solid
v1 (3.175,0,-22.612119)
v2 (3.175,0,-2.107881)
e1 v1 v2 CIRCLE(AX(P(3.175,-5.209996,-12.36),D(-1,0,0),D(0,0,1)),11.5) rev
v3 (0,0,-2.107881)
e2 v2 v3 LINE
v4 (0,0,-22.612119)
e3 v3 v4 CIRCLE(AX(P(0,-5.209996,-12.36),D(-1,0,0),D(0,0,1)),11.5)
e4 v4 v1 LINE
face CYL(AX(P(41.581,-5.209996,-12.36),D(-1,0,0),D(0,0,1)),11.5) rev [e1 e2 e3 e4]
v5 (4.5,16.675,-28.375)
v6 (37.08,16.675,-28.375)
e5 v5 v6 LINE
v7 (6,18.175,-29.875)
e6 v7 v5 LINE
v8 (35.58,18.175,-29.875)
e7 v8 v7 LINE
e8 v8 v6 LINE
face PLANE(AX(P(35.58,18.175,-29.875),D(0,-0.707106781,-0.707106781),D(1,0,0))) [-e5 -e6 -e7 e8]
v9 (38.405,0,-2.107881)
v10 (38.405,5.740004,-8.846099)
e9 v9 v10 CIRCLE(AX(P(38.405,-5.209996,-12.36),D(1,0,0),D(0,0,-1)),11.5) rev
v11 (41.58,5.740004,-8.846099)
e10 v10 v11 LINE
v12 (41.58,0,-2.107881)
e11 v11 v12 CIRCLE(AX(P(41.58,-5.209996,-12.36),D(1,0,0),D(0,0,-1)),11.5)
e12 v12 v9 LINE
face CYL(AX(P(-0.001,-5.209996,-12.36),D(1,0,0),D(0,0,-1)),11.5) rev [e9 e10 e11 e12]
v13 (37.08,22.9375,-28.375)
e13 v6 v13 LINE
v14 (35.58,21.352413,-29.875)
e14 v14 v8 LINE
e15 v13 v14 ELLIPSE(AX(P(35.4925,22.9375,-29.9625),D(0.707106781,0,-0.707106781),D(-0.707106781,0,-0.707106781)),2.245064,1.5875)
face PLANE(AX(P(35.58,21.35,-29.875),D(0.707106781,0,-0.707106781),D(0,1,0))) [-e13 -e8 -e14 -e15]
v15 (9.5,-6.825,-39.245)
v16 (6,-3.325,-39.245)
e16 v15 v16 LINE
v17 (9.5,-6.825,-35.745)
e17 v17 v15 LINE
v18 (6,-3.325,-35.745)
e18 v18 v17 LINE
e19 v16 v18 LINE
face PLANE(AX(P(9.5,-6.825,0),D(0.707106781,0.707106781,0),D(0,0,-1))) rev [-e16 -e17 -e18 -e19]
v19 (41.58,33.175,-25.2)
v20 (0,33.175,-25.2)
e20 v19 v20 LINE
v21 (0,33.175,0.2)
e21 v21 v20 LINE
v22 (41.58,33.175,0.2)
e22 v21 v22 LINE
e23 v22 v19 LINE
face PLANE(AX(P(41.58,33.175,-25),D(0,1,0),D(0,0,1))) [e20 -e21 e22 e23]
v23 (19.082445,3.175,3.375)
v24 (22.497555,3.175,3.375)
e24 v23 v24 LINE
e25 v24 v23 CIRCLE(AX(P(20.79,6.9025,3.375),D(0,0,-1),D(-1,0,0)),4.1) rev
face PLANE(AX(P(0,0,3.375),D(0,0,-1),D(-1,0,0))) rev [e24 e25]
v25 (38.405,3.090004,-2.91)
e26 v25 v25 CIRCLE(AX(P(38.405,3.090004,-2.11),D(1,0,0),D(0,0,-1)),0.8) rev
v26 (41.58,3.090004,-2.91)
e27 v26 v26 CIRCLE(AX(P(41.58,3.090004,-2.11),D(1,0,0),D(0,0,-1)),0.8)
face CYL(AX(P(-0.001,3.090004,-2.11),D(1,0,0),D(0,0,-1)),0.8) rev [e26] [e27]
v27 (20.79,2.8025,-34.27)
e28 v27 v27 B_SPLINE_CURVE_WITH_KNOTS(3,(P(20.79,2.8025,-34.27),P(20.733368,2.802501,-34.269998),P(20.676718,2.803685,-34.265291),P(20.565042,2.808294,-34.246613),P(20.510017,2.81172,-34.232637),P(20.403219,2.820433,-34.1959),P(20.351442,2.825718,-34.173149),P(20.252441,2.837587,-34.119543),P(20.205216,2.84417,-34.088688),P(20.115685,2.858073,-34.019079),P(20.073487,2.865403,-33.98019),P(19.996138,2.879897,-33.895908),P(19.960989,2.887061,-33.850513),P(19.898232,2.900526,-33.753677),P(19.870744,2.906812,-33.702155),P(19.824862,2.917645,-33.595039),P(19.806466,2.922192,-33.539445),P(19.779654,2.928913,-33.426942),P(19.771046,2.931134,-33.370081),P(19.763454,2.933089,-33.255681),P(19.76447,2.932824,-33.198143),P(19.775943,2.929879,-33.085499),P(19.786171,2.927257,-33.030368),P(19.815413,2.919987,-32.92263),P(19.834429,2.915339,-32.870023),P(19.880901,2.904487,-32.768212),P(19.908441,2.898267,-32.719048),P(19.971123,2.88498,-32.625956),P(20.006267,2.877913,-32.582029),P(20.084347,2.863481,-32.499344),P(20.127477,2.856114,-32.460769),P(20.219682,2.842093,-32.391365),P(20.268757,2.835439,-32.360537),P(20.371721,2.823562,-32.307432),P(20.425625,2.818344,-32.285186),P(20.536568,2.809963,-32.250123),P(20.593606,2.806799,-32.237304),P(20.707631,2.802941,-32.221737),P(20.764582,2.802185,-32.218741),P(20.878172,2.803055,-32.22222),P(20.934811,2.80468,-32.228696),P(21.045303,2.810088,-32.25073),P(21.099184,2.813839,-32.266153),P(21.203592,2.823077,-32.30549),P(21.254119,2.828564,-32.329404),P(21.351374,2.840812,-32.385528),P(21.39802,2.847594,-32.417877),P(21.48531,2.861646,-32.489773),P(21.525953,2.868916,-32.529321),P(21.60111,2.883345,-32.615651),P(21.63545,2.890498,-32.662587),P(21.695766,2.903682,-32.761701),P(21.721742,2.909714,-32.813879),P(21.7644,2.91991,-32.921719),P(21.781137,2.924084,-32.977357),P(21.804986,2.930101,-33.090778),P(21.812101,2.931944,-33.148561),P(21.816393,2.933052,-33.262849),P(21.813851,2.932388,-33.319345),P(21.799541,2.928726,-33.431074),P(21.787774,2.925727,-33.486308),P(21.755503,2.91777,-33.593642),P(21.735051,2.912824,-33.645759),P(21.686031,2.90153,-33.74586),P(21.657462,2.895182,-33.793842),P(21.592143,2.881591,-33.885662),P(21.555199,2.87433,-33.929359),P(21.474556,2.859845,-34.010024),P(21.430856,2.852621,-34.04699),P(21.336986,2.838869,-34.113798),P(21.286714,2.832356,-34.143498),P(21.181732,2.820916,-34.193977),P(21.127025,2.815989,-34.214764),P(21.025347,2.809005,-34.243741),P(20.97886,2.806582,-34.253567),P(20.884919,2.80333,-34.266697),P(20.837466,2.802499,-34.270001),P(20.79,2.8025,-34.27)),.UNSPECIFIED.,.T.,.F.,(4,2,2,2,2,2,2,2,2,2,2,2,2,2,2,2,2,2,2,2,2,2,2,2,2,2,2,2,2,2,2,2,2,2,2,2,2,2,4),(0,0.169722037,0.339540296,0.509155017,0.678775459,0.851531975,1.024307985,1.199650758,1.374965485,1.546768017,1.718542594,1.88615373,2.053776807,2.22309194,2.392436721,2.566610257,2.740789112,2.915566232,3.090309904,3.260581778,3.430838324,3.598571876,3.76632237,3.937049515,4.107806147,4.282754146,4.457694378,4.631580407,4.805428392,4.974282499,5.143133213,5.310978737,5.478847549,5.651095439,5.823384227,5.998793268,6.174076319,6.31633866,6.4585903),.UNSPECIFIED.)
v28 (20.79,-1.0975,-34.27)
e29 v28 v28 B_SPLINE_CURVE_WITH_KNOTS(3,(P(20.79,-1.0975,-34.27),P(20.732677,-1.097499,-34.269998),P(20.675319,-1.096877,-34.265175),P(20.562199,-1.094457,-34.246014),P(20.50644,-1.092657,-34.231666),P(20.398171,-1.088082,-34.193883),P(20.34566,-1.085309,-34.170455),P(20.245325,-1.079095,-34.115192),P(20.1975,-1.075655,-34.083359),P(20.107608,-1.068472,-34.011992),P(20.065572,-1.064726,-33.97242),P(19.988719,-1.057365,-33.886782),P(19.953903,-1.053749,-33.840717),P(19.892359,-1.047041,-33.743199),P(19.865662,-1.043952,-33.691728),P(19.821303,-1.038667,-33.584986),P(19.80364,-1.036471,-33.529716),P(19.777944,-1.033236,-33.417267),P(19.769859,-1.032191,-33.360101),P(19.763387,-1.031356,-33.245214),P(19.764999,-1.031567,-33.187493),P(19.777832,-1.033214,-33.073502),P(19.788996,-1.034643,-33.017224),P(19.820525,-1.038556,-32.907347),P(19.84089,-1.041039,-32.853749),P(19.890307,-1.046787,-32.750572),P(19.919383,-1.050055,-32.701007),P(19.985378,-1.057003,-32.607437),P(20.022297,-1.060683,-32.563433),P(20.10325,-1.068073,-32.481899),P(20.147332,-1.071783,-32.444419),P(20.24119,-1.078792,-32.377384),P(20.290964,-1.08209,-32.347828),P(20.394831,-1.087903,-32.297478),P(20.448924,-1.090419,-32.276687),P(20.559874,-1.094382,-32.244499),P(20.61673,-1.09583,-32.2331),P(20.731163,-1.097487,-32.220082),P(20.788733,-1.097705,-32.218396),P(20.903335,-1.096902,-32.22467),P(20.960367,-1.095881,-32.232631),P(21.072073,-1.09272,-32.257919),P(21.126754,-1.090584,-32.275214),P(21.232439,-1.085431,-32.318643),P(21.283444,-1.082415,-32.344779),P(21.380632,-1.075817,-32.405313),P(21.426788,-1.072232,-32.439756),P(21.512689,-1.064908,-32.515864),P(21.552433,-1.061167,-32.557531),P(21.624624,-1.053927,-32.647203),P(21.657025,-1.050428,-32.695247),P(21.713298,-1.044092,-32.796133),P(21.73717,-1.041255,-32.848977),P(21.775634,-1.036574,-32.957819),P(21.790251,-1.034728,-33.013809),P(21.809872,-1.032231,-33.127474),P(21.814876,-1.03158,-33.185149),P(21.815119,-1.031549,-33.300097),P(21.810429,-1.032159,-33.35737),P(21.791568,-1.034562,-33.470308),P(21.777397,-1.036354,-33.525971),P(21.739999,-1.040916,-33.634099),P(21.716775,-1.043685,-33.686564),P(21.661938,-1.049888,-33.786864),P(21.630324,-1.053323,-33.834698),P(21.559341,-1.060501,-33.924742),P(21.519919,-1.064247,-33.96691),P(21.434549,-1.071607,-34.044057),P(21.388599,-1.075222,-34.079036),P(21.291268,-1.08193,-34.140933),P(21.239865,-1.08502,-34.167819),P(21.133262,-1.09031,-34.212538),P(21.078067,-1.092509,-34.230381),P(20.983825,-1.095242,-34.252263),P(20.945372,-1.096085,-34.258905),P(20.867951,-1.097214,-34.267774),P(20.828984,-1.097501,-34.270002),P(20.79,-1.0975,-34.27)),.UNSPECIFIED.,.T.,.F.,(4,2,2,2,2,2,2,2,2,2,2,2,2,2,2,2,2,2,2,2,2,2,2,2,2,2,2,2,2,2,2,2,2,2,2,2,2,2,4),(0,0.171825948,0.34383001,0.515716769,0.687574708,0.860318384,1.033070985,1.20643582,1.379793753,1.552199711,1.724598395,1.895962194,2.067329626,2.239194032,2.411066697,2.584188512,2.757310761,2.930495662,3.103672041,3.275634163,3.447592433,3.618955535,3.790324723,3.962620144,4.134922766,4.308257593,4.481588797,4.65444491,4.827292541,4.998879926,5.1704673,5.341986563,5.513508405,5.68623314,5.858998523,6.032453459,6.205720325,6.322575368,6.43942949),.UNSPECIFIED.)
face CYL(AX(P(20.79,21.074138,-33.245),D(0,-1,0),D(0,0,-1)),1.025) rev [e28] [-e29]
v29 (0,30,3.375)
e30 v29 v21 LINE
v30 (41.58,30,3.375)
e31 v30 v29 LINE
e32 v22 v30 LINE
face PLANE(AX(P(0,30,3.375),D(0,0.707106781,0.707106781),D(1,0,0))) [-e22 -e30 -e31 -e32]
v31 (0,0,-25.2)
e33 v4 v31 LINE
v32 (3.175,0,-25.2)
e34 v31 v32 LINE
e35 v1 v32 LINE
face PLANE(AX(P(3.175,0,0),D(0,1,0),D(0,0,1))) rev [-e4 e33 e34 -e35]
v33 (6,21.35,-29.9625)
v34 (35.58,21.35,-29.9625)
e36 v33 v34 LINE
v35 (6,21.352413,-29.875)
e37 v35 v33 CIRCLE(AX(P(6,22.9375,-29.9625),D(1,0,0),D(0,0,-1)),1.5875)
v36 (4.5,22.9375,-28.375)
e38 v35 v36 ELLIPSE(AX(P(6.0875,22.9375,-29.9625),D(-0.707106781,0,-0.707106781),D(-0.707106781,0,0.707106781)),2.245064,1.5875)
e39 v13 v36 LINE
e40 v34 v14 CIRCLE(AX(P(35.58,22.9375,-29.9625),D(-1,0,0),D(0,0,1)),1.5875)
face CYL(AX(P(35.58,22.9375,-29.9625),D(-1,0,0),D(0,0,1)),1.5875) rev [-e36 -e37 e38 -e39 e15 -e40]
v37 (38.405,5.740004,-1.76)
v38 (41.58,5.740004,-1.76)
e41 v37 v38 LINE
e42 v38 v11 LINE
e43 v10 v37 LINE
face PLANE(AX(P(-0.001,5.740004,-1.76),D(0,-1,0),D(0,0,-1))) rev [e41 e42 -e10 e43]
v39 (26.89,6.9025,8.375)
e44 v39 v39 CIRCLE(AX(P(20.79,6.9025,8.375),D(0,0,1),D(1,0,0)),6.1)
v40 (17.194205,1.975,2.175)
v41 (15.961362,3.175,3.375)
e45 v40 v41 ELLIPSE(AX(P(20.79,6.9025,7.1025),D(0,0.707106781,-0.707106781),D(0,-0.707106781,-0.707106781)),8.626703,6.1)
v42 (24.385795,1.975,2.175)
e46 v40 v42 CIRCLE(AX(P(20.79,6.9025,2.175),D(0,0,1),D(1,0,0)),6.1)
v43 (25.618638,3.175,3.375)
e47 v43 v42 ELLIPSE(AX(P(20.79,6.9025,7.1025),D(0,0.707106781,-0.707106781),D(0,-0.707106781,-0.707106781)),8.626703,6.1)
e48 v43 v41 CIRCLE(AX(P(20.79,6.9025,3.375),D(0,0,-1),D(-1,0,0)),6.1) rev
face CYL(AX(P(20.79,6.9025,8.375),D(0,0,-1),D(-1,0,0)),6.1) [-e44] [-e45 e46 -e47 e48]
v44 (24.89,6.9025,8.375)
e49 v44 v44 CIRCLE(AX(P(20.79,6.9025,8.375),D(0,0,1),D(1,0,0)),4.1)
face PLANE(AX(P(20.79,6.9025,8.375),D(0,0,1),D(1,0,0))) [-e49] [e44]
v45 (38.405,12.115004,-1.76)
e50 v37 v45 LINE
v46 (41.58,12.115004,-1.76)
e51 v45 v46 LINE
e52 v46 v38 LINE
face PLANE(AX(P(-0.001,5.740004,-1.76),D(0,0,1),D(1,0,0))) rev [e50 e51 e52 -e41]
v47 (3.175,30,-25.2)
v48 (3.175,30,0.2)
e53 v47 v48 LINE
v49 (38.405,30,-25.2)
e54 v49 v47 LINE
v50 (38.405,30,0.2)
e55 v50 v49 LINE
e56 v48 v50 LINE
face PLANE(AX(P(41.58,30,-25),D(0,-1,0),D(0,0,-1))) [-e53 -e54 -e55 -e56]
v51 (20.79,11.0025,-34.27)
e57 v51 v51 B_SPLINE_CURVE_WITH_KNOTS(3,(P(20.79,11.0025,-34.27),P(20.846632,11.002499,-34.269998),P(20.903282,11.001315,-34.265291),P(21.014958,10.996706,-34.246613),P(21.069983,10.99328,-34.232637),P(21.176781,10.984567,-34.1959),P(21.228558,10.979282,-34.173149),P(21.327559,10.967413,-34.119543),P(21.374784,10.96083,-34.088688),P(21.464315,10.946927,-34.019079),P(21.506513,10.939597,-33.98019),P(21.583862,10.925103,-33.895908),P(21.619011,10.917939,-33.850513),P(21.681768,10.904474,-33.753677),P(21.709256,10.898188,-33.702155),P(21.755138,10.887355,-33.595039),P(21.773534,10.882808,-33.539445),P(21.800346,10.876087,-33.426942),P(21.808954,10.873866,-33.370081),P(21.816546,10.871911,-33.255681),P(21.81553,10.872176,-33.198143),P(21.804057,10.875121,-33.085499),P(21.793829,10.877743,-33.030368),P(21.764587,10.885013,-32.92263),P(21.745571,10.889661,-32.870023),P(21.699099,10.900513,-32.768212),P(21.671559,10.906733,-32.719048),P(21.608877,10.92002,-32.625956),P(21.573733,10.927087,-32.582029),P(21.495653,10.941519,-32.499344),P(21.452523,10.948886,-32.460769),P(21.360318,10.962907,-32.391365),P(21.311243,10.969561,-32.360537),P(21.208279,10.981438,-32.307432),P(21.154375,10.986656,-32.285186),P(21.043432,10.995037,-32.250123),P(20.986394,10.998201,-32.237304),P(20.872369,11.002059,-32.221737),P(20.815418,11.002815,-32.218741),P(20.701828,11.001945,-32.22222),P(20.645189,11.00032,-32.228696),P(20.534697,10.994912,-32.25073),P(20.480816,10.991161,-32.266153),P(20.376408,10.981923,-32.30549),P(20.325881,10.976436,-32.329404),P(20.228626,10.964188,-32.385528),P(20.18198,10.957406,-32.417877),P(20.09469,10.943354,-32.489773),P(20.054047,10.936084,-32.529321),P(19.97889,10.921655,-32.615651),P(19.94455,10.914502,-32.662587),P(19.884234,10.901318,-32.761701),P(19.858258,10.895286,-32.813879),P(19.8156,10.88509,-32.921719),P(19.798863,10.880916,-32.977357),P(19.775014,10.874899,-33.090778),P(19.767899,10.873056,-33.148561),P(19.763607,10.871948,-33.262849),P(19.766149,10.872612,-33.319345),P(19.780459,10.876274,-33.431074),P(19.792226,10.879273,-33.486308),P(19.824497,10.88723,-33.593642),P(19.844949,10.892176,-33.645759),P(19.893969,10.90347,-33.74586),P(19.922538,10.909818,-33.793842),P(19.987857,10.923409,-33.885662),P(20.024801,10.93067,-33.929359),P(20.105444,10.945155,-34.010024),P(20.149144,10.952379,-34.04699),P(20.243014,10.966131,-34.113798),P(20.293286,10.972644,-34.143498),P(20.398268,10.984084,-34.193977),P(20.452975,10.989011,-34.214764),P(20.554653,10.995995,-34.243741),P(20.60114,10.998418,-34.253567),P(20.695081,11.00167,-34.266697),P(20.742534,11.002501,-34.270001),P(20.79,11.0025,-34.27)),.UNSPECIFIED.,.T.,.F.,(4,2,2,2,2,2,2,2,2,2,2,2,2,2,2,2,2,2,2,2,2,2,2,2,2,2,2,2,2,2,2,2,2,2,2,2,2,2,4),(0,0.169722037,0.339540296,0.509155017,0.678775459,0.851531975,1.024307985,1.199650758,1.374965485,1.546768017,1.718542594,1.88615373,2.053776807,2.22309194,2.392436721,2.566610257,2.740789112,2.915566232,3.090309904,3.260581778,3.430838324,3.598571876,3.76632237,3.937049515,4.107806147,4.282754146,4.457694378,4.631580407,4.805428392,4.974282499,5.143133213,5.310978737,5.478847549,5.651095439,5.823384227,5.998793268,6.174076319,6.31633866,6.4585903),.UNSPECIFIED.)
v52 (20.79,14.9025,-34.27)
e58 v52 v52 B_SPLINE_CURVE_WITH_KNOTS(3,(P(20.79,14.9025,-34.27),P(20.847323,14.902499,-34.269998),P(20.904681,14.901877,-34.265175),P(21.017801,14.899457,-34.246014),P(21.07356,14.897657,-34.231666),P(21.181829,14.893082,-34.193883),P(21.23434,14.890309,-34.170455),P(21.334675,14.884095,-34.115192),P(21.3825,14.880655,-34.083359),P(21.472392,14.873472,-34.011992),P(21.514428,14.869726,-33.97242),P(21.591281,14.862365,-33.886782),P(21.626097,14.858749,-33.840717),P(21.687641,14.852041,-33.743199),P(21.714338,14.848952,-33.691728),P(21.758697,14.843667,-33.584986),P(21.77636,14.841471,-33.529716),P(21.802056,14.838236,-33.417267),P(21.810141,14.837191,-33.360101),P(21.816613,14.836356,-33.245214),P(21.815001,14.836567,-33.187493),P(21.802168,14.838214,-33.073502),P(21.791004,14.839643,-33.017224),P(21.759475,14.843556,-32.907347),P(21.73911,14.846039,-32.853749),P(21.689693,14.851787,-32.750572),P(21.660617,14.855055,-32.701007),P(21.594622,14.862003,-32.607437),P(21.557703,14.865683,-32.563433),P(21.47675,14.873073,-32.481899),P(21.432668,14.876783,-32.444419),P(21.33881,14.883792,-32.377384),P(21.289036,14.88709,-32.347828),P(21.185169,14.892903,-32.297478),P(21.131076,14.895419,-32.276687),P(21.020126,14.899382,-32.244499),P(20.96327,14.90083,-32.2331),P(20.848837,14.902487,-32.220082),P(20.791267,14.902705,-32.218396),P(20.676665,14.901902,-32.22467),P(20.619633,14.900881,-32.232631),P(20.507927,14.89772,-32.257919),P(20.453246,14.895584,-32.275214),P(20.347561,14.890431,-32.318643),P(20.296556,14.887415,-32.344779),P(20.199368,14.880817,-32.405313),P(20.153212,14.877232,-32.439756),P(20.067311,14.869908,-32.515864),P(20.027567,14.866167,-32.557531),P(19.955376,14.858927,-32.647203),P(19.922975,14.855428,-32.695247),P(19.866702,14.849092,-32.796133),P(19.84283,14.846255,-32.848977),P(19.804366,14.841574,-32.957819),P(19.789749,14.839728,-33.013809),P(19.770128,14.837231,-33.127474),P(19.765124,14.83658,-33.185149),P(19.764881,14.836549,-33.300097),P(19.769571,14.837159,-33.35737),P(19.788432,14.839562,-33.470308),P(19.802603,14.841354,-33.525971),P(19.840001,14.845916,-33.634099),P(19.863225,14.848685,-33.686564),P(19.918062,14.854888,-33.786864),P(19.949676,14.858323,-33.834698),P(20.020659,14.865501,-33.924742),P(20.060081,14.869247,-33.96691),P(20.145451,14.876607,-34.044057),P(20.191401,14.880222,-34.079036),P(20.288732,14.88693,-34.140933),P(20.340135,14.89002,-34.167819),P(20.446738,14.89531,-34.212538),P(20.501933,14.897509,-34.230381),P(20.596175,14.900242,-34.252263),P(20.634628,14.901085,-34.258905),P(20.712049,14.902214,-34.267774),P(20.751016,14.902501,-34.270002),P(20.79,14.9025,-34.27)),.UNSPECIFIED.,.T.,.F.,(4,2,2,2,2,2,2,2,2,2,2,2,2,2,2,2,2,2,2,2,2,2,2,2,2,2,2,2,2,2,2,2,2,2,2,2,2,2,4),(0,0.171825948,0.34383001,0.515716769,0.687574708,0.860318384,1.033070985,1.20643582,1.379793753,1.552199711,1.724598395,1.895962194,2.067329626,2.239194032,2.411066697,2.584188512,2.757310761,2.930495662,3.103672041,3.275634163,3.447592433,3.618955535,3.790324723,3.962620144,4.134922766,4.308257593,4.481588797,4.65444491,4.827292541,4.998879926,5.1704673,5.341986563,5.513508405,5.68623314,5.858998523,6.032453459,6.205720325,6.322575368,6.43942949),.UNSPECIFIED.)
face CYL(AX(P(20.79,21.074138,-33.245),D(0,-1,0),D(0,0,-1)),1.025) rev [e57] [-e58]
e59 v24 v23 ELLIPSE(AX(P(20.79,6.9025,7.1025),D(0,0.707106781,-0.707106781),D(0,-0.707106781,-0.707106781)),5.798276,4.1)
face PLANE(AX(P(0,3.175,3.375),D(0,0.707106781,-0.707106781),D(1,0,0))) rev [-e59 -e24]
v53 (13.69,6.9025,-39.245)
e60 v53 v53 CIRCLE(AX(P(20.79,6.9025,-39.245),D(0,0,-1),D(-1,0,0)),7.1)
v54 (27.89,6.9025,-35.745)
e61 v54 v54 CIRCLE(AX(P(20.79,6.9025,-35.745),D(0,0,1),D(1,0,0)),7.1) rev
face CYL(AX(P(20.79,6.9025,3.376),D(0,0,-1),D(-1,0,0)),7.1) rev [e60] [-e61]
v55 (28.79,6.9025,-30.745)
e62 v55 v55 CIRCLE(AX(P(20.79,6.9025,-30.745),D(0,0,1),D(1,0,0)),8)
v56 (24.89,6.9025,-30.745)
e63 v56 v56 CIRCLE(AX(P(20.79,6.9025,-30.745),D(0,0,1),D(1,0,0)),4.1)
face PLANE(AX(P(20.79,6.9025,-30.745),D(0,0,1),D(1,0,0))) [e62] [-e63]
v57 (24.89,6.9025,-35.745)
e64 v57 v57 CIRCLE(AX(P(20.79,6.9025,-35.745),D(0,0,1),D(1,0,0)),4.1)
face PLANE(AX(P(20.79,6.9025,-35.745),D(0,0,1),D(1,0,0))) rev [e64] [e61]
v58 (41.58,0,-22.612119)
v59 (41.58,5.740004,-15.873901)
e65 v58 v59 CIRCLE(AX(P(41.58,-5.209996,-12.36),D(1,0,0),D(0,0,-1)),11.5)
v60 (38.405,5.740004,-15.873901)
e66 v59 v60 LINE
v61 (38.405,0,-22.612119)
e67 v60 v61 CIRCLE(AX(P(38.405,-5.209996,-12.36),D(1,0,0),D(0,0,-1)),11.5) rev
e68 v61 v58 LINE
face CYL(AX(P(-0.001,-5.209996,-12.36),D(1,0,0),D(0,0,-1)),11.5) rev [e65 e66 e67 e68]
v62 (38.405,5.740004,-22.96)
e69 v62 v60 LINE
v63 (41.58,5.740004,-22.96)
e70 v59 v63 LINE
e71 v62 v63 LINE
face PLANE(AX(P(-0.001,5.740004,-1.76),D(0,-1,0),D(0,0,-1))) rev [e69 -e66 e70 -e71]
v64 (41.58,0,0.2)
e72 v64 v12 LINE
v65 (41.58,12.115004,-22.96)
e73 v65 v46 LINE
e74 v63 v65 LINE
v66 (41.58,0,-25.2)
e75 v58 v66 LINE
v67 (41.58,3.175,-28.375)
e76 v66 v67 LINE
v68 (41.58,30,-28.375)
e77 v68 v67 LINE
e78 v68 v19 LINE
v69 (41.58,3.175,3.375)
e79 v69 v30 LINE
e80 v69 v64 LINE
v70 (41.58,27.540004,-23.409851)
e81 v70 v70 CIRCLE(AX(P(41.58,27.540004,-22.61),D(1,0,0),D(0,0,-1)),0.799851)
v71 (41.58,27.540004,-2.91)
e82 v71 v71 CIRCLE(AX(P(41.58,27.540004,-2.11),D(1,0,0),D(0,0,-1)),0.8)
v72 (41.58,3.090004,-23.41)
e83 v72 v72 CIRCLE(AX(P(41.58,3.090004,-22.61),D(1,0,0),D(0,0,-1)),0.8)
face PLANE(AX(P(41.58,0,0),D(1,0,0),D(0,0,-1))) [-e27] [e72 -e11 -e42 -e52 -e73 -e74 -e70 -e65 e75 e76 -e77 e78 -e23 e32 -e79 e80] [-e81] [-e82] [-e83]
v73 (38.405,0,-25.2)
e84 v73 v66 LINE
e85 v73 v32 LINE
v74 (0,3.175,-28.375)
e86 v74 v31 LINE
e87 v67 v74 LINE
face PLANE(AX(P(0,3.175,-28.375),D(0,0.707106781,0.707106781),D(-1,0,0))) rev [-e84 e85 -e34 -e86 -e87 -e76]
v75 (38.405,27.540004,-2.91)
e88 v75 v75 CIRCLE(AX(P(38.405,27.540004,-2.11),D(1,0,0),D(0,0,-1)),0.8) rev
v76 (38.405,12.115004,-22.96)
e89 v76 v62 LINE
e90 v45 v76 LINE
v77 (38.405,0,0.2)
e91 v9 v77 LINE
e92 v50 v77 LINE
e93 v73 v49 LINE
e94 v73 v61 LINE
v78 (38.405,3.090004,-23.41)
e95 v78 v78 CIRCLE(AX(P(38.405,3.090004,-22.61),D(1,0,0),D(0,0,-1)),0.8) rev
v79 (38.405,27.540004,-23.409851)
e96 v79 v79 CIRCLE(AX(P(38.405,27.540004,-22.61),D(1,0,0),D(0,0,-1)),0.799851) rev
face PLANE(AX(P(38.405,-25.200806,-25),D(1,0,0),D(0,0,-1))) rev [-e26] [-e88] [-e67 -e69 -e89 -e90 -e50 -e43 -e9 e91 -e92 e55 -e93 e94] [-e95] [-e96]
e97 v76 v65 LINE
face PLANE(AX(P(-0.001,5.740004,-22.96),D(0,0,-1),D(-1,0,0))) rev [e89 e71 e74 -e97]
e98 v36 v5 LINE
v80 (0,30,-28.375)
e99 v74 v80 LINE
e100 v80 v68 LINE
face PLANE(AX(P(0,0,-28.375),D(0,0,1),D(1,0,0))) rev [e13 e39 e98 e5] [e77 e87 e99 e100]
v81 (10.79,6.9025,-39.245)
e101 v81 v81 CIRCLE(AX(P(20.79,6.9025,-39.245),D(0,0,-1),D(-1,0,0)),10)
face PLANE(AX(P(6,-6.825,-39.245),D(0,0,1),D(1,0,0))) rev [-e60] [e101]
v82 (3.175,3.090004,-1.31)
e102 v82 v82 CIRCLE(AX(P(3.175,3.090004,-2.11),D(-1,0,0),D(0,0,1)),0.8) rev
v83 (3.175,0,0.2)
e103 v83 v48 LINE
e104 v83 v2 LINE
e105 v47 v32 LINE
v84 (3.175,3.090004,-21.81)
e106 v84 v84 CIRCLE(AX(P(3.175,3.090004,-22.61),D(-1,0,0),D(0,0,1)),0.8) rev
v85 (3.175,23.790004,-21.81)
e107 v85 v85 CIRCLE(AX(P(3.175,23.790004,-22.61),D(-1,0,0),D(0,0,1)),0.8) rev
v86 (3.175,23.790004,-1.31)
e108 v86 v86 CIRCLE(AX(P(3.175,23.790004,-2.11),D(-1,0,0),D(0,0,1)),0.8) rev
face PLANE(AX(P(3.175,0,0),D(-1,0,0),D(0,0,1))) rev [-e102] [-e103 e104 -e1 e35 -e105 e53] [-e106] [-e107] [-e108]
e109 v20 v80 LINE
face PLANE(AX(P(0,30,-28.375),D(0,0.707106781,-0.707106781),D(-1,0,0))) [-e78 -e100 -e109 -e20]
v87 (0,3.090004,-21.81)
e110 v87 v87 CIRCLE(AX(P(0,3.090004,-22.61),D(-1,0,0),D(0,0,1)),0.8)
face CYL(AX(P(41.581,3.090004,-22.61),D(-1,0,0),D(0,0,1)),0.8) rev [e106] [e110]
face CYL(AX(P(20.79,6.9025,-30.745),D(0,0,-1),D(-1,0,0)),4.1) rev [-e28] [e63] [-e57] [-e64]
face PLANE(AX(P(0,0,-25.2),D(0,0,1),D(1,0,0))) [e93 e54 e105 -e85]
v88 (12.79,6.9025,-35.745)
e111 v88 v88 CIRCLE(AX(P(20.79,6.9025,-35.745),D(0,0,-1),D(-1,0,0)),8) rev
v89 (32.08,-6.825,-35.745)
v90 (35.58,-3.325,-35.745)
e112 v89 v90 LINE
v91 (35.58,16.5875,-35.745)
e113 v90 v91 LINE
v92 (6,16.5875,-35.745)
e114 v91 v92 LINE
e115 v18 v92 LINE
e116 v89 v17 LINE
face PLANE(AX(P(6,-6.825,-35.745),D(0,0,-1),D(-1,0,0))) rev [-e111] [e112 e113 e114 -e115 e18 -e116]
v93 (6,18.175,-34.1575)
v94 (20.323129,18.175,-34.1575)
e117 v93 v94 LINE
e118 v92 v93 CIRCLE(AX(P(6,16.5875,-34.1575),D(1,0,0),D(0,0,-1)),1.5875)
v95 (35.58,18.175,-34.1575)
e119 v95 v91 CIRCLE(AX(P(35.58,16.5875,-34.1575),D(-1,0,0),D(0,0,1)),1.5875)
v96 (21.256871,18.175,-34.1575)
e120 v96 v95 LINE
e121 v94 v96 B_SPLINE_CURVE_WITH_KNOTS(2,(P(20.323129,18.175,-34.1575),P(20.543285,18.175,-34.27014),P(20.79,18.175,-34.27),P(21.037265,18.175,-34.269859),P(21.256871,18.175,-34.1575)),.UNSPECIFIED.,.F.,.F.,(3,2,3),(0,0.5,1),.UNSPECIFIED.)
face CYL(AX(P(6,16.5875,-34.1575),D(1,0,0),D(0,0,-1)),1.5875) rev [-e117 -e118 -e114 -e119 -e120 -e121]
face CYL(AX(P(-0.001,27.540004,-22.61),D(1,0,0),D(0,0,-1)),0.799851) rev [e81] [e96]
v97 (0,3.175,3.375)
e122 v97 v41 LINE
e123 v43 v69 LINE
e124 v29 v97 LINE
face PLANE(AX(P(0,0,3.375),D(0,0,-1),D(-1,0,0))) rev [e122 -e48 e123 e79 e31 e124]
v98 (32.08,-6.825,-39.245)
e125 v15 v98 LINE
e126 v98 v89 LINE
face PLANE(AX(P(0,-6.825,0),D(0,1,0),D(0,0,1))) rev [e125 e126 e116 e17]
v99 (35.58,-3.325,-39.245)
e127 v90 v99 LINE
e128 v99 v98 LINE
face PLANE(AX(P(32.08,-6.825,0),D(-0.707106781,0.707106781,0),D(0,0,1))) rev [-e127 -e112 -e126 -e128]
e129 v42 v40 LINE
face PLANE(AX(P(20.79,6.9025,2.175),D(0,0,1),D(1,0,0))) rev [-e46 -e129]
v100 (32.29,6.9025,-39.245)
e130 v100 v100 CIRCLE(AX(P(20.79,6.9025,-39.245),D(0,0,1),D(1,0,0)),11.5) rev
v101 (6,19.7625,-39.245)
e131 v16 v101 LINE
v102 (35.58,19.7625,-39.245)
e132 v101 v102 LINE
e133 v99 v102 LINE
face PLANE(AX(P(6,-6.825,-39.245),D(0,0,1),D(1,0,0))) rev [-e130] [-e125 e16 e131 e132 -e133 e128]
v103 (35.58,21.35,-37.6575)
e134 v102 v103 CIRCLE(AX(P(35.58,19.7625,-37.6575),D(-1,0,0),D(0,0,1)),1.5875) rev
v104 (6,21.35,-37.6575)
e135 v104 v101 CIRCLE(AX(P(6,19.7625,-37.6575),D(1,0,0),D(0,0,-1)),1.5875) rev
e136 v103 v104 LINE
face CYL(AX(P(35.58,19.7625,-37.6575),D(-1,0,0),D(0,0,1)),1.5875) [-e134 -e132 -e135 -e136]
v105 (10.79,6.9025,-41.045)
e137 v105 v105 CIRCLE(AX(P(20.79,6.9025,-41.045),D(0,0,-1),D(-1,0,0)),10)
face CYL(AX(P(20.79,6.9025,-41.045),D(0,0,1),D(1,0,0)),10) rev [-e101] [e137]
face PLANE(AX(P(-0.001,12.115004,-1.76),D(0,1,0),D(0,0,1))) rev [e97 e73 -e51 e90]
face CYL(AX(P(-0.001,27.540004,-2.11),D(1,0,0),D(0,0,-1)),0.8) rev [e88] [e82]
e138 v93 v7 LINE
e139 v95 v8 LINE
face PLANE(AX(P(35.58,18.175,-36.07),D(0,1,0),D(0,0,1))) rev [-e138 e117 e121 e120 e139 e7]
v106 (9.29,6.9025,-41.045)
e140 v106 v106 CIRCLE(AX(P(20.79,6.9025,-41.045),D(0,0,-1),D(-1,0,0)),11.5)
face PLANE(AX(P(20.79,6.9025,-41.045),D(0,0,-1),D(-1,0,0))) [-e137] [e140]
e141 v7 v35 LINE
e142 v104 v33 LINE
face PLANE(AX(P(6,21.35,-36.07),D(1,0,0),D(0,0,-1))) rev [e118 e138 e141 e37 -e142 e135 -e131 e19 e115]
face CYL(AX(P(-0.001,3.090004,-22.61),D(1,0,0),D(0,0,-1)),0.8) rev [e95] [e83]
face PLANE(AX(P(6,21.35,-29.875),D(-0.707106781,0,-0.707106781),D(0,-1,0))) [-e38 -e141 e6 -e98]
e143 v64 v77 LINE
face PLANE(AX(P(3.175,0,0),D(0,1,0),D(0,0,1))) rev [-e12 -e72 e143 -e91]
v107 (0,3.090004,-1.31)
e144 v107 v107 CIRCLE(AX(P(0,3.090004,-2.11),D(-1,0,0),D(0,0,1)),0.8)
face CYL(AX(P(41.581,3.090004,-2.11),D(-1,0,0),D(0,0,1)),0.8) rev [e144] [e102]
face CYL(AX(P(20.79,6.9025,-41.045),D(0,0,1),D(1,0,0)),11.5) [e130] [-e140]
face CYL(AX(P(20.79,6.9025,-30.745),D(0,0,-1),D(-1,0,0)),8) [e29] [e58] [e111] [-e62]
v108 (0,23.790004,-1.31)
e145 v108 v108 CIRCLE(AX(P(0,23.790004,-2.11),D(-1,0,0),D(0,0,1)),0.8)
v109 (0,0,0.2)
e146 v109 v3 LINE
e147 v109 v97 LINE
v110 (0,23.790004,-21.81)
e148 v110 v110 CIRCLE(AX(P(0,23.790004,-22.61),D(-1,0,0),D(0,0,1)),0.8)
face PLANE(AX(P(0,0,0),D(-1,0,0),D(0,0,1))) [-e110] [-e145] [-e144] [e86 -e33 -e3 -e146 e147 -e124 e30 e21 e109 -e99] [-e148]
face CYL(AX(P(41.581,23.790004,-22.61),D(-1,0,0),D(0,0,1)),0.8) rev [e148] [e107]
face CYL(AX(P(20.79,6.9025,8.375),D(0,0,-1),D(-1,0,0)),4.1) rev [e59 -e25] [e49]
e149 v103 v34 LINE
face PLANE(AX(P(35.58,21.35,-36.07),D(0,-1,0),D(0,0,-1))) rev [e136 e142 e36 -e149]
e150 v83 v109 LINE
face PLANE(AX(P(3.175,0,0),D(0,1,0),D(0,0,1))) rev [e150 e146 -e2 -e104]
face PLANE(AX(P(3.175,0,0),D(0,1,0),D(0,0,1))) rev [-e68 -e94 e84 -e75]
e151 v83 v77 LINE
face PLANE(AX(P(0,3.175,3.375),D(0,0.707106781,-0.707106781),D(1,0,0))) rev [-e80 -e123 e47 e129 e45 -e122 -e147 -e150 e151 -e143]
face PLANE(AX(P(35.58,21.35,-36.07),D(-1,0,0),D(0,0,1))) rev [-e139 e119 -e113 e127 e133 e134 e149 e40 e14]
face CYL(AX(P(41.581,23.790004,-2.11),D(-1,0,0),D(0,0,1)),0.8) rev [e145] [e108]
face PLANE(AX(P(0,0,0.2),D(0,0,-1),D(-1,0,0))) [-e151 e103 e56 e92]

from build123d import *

# Parameters (mm, degrees)
SKETCH1_W                       = 25
SKETCH1_H                       = 30
BOSS_EXTRUDE1_DEPTH             = 3.175
SKETCH2_W                       = 25
SKETCH2_H                       = 3.175
BOSS_EXTRUDE2_DEPTH             = 41.58
SKETCH3_W                       = 3.175
SKETCH3_H                       = 25
BOSS_EXTRUDE3_DEPTH             = 30
CUT_EXTRUDE1_REACH              = 60.775
SKETCH4_R                       = 11.5
CUT_EXTRUDE2_REACH              = 60.775
SKETCH5_R                       = 0.8
CUT_EXTRUDE3_REACH              = 60.775
SKETCH6_R                       = 0.8
SKETCH6_R_2                     = 0.799851166
SKETCH6_W                       = 21.2
SKETCH6_H                       = 6.375
CUT_EXTRUDE4_REACH              = 60.775
SKETCH7_R                       = 11.5
BOSS_EXTRUDE4_DEPTH             = 0.2
SKETCH9_W                       = 41.58
SKETCH9_H                       = 33.175
BOSS_EXTRUDE5_DEPTH             = 3.175
BOSS_EXTRUDE6_DEPTH             = 0.2
SKETCH11_W                      = 41.58
SKETCH11_H                      = 33.175
BOSS_EXTRUDE7_DEPTH             = 3.175
CHAMFER1_SIZE                   = 3.175
CHAMFER2_SIZE                   = 3.175
SKETCH13_W                      = 29.58
SKETCH13_H                      = 3.175
BOSS_EXTRUDE8_DEPTH             = 7.695
BOSS_EXTRUDE9_REACH             = 59.968
SKETCH14_W                      = 29.58
SKETCH14_H                      = 3.5
BOSS_EXTRUDE9_DIRECTION_2_DEPTH = 25
CHAMFER3_SIZE                   = 3.5
FILLET1_R                       = 1.5875
FILLET2_R                       = 1.5875
CUT_EXTRUDE5_REACH              = 70.161
SKETCH16_R                      = 7.1
SKETCH20_R                      = 8
SKETCH20_R_2                    = 4.1
BOSS_EXTRUDE11_DEPTH            = 5
CUT_EXTRUDE6_START              = -21.7275
SKETCH21_R                      = 1.025
CUT_EXTRUDE6_DEPTH              = 16
BOSS_EXTRUDE12_DEPTH            = 5
BOSS_EXTRUDE12_DEPTH_BACK       = 1.2
SKETCH23_R                      = 6.1
SKETCH23_R_2                    = 4.1
CHAMFER4_SIZE                   = 1.5
SKETCH24_R                      = 11.5
SKETCH24_R_2                    = 10
BOSS_EXTRUDE13_DEPTH            = 1.8


with BuildPart() as part:
    # Sketch1 → Boss-Extrude1 (new body)
    with BuildSketch(Plane(origin=(0, 0, 0), x_dir=(0, 0, -1), z_dir=(1, 0, 0))):
        with Locations((12.5, 15)):
            Rectangle(SKETCH1_W, SKETCH1_H)
    extrude(amount=BOSS_EXTRUDE1_DEPTH)

    # Sketch2 → Boss-Extrude2 (add)
    with BuildSketch(Plane.ZY):
        with Locations((-12.5, 31.5875)):
            Rectangle(SKETCH2_W, SKETCH2_H)
    extrude(amount=-BOSS_EXTRUDE2_DEPTH)

    # Sketch3 → Boss-Extrude3 (add)
    with BuildSketch(Plane.XZ.offset(-30)):
        with Locations((39.9925, -12.5)):
            Rectangle(SKETCH3_W, SKETCH3_H)
    extrude(amount=BOSS_EXTRUDE3_DEPTH)

    # Sketch4 → Cut-Extrude1 (cut, up to next)
    with BuildSketch(Plane.ZY, mode=Mode.PRIVATE) as cut_extrude1_sk1:
        with Locations((-12.359999929, -5.209996254)):
            Circle(SKETCH4_R)
    cut_extrude1_tool1 = extrude(cut_extrude1_sk1.sketch, amount=-CUT_EXTRUDE1_REACH, mode=Mode.PRIVATE) & part.part
    add(cut_extrude1_tool1.solids().sort_by_distance((0, -5.209996, -12.36))[0], mode=Mode.SUBTRACT)

    # Sketch5 → Cut-Extrude2 (cut, up to next)
    with BuildSketch(Plane.ZY, mode=Mode.PRIVATE) as cut_extrude2_sk1:
        with Locations((-22.609999929, 3.090003746)):
            Circle(SKETCH5_R)
    cut_extrude2_tool1 = extrude(cut_extrude2_sk1.sketch, amount=-CUT_EXTRUDE2_REACH, mode=Mode.PRIVATE) & part.part
    # Sketch5 → Cut-Extrude2 (cut, up to next)
    with BuildSketch(Plane.ZY, mode=Mode.PRIVATE) as cut_extrude2_sk2:
        with Locations((-22.609999929, 23.790003746)):
            Circle(SKETCH5_R)
    cut_extrude2_tool2 = extrude(cut_extrude2_sk2.sketch, amount=-CUT_EXTRUDE2_REACH, mode=Mode.PRIVATE) & part.part
    # Sketch5 → Cut-Extrude2 (cut, up to next)
    with BuildSketch(Plane.ZY, mode=Mode.PRIVATE) as cut_extrude2_sk3:
        with Locations((-2.109999929, 23.790003746)):
            Circle(SKETCH5_R)
    cut_extrude2_tool3 = extrude(cut_extrude2_sk3.sketch, amount=-CUT_EXTRUDE2_REACH, mode=Mode.PRIVATE) & part.part
    # Sketch5 → Cut-Extrude2 (cut, up to next)
    with BuildSketch(Plane.ZY, mode=Mode.PRIVATE) as cut_extrude2_sk4:
        with Locations((-2.109999929, 3.090003746)):
            Circle(SKETCH5_R)
    cut_extrude2_tool4 = extrude(cut_extrude2_sk4.sketch, amount=-CUT_EXTRUDE2_REACH, mode=Mode.PRIVATE) & part.part
    add(cut_extrude2_tool1.solids().sort_by_distance((0, 3.090004, -22.61))[0], mode=Mode.SUBTRACT)
    add(cut_extrude2_tool2.solids().sort_by_distance((0, 23.790004, -22.61))[0], mode=Mode.SUBTRACT)
    add(cut_extrude2_tool3.solids().sort_by_distance((0, 23.790004, -2.11))[0], mode=Mode.SUBTRACT)
    add(cut_extrude2_tool4.solids().sort_by_distance((0, 3.090004, -2.11))[0], mode=Mode.SUBTRACT)

    # Sketch6 → Cut-Extrude3 (cut, up to next)
    with BuildSketch(Plane(origin=(41.58, 0, 0), x_dir=(0, 0, -1), z_dir=(1, 0, 0)), mode=Mode.PRIVATE) as cut_extrude3_sk1:
        with Locations(Location((2.109999929, 3.090003746, 0), (0, 0, 180))):
            Circle(SKETCH6_R)
    cut_extrude3_tool1 = extrude(cut_extrude3_sk1.sketch, amount=-CUT_EXTRUDE3_REACH, mode=Mode.PRIVATE) & part.part
    # Sketch6 → Cut-Extrude3 (cut, up to next)
    with BuildSketch(Plane(origin=(41.58, 0, 0), x_dir=(0, 0, -1), z_dir=(1, 0, 0)), mode=Mode.PRIVATE) as cut_extrude3_sk2:
        with Locations(Location((22.609999929, 3.090003746, 0), (0, 0, 180))):
            Circle(SKETCH6_R)
    cut_extrude3_tool2 = extrude(cut_extrude3_sk2.sketch, amount=-CUT_EXTRUDE3_REACH, mode=Mode.PRIVATE) & part.part
    # Sketch6 → Cut-Extrude3 (cut, up to next)
    with BuildSketch(Plane(origin=(41.58, 0, 0), x_dir=(0, 0, -1), z_dir=(1, 0, 0)), mode=Mode.PRIVATE) as cut_extrude3_sk3:
        with Locations((22.609999929, 27.540003746)):
            Circle(SKETCH6_R_2)
    cut_extrude3_tool3 = extrude(cut_extrude3_sk3.sketch, amount=-CUT_EXTRUDE3_REACH, mode=Mode.PRIVATE) & part.part
    # Sketch6 → Cut-Extrude3 (cut, up to next)
    with BuildSketch(Plane(origin=(41.58, 0, 0), x_dir=(0, 0, -1), z_dir=(1, 0, 0)), mode=Mode.PRIVATE) as cut_extrude3_sk4:
        with Locations((2.109999929, 27.540003746)):
            Circle(SKETCH6_R)
    cut_extrude3_tool4 = extrude(cut_extrude3_sk4.sketch, amount=-CUT_EXTRUDE3_REACH, mode=Mode.PRIVATE) & part.part
    # Sketch6 → Cut-Extrude3 (cut, up to next)
    with BuildSketch(Plane(origin=(41.58, 0, 0), x_dir=(0, 0, -1), z_dir=(1, 0, 0)), mode=Mode.PRIVATE) as cut_extrude3_sk5:
        with Locations((12.359999929, 8.927503746)):
            Rectangle(SKETCH6_W, SKETCH6_H)
    cut_extrude3_tool5 = extrude(cut_extrude3_sk5.sketch, amount=-CUT_EXTRUDE3_REACH, mode=Mode.PRIVATE) & part.part
    add(cut_extrude3_tool1.solids().sort_by_distance((41.58, 3.090004, -2.11))[0], mode=Mode.SUBTRACT)
    add(cut_extrude3_tool2.solids().sort_by_distance((41.58, 3.090004, -22.61))[0], mode=Mode.SUBTRACT)
    add(cut_extrude3_tool3.solids().sort_by_distance((41.58, 27.540004, -22.61))[0], mode=Mode.SUBTRACT)
    add(cut_extrude3_tool4.solids().sort_by_distance((41.58, 27.540004, -2.11))[0], mode=Mode.SUBTRACT)
    add(cut_extrude3_tool5.solids().sort_by_distance((41.58, 8.927504, -12.36))[0], mode=Mode.SUBTRACT)

    # Sketch7 → Cut-Extrude4 (cut, up to next)
    with BuildSketch(Plane(origin=(41.58, 0, 0), x_dir=(0, 0, -1), z_dir=(1, 0, 0)), mode=Mode.PRIVATE) as cut_extrude4_sk1:
        with Locations((12.359999929, -5.209996254)):
            Circle(SKETCH7_R)
    cut_extrude4_tool1 = extrude(cut_extrude4_sk1.sketch, amount=-CUT_EXTRUDE4_REACH, mode=Mode.PRIVATE) & part.part
    add(cut_extrude4_tool1.solids().sort_by_distance((41.58, -5.209996, -12.36))[0], mode=Mode.SUBTRACT)

    # Sketch8 → Boss-Extrude4 (add)
    with BuildSketch(Plane.XY):
        Polygon((0, 33.175), (0, 0), (3.175, 0), (3.175, 30), (38.405, 30), (38.405, 0), (41.58, 0), (41.58, 33.175), align=None)
    extrude(amount=BOSS_EXTRUDE4_DEPTH)

    # Sketch9 → Boss-Extrude5 (add)
    with BuildSketch(Plane.XY.offset(0.2)):
        with Locations((20.79, 16.5875)):
            Rectangle(SKETCH9_W, SKETCH9_H)
    extrude(amount=BOSS_EXTRUDE5_DEPTH)

    # Sketch10 → Boss-Extrude6 (add)
    with BuildSketch(Plane(origin=(0, 0, -25), x_dir=(-1, 0, 0), z_dir=(0, 0, -1))):
        Polygon((0, 0), (0, 33.175), (-41.58, 33.175), (-41.58, 0), (-38.405, 0), (-38.405, 30), (-3.175, 30), (-3.175, 0), align=None)
    extrude(amount=BOSS_EXTRUDE6_DEPTH)

    # Sketch11 → Boss-Extrude7 (add)
    with BuildSketch(Plane(origin=(0, 0, -25.2), x_dir=(-1, 0, 0), z_dir=(0, 0, -1))):
        with Locations((-20.79, 16.5875)):
            Rectangle(SKETCH11_W, SKETCH11_H)
    extrude(amount=BOSS_EXTRUDE7_DEPTH)

    # Chamfer1
    chamfer1_edges = [part.edges().sort_by_distance(p)[0] for p in [
        (20.79, 33.175, 3.375),
        (20.79, 33.175, -28.375),
    ]]
    chamfer(chamfer1_edges, length=CHAMFER1_SIZE)

    # Chamfer2
    chamfer2_edges = [part.edges().sort_by_distance(p)[0] for p in [
        (20.79, 0, 3.375),
        (20.79, 0, -28.375),
    ]]
    chamfer(chamfer2_edges, length=CHAMFER2_SIZE - 0.0001)  # a hair under: the kernel refuses the full size

    # Sketch13 → Boss-Extrude8 (add)
    with BuildSketch(Plane(origin=(0, 0, -28.375), x_dir=(-1, 0, 0), z_dir=(0, 0, -1))):
        with Locations((-20.79, 19.7625)):
            Rectangle(SKETCH13_W, SKETCH13_H)
    extrude(amount=BOSS_EXTRUDE8_DEPTH)

    # Boss-Extrude9: up to this face of the body (flat: up to its plane)
    boss_extrude9_end = Plane(part.part.faces().sort_by_distance((20.79, 21.35, -32.2225))[0])
    # Sketch14 → Boss-Extrude9 (add, up to the picked face)
    with BuildSketch(Plane.XZ.offset(-18.175), mode=Mode.PRIVATE) as boss_extrude9_sk1:
        with Locations((20.79, -37.495)):
            Rectangle(SKETCH14_W, SKETCH14_H)
    boss_extrude9_tool1 = split(extrude(boss_extrude9_sk1.sketch, amount=-BOSS_EXTRUDE9_REACH, mode=Mode.PRIVATE), bisect_by=boss_extrude9_end, keep=Keep.BOTH, mode=Mode.PRIVATE)
    add(boss_extrude9_tool1.solids().sort_by(Axis((20.79, 18.175, -37.495), (0, 1, 0)))[0])

    # Sketch14 → Boss-Extrude9 direction 2 (add)
    with BuildSketch(Plane.XZ.offset(-18.175)):
        with Locations((20.79, -37.495)):
            Rectangle(SKETCH14_W, SKETCH14_H)
    extrude(amount=BOSS_EXTRUDE9_DIRECTION_2_DEPTH)

    # Chamfer3
    chamfer3_edges = [part.edges().sort_by_distance(p)[0] for p in [
        (6, -6.825, -37.495),
        (35.58, -6.825, -37.495),
    ]]
    chamfer(chamfer3_edges, length=CHAMFER3_SIZE)

    # Fillet1
    fillet1_edges = [part.edges().sort_by_distance(p)[0] for p in [
        (20.79, 18.175, -35.745),
        (20.79, 21.35, -39.245),
    ]]
    fillet(fillet1_edges, radius=FILLET1_R)

    # Fillet2
    fillet2_edges = [part.edges().sort_by_distance(p)[0] for p in [
        (20.79, 21.35, -28.375),
    ]]
    fillet(fillet2_edges, radius=FILLET2_R)

    # Sketch16 → Cut-Extrude5 (cut, up to next)
    with BuildSketch(Plane(origin=(0, 0, -39.245), x_dir=(-1, 0, 0), z_dir=(0, 0, -1)), mode=Mode.PRIVATE) as cut_extrude5_sk1:
        with Locations((-20.79, 6.9025)):
            Circle(SKETCH16_R)
    cut_extrude5_tool1 = extrude(cut_extrude5_sk1.sketch, amount=-CUT_EXTRUDE5_REACH, mode=Mode.PRIVATE) & part.part
    add(cut_extrude5_tool1.solids().sort_by_distance((20.79, 6.9025, -39.245))[0], mode=Mode.SUBTRACT)

    # Sketch20 → Boss-Extrude11 (add)
    with BuildSketch(Plane.XY.offset(-35.745)):
        with Locations(Location((20.79, 6.9025, 0), (0, 0, 180))):
            Circle(SKETCH20_R)
        with Locations((20.79, 6.9025)):
            Circle(SKETCH20_R_2, mode=Mode.SUBTRACT)
    extrude(amount=BOSS_EXTRUDE11_DEPTH)

    # Sketch21 → Cut-Extrude6 (cut)
    with BuildSketch(Plane.XZ.offset(6.825).offset(CUT_EXTRUDE6_START)):
        with Locations(Location((20.79, -33.245, 0), (0, 0, 270))):
            Circle(SKETCH21_R)
    extrude(amount=CUT_EXTRUDE6_DEPTH, mode=Mode.SUBTRACT)

    # Sketch23 → Boss-Extrude12 (add, two sides: drawn at the far end of the back side and taken through both)
    with BuildSketch(Plane.XY.offset(3.375).offset(-BOSS_EXTRUDE12_DEPTH_BACK)):
        with Locations(Location((20.79, 6.9025, 0), (0, 0, 217.666590828))):
            Circle(SKETCH23_R)
        with Locations((20.79, 6.9025)):
            Circle(SKETCH23_R_2, mode=Mode.SUBTRACT)
    extrude(amount=BOSS_EXTRUDE12_DEPTH + BOSS_EXTRUDE12_DEPTH_BACK)

    # Chamfer4
    chamfer4_edges = [part.edges().sort_by_distance(p)[0] for p in [
        (35.58, 20.55625, -28.375),
        (20.79, 18.175, -28.375),
        (6, 20.55625, -28.375),
    ]]
    chamfer(chamfer4_edges, length=CHAMFER4_SIZE)

    # Sketch24 → Boss-Extrude13 (add)
    with BuildSketch(Plane(origin=(0, 0, -39.245), x_dir=(-1, 0, 0), z_dir=(0, 0, -1))):
        with Locations(Location((-20.79, 6.9025, 0), (0, 0, 180))):
            Circle(SKETCH24_R)
        with Locations((-20.79, 6.9025)):
            Circle(SKETCH24_R_2, mode=Mode.SUBTRACT)
    extrude(amount=BOSS_EXTRUDE13_DEPTH)


solid = part.part
